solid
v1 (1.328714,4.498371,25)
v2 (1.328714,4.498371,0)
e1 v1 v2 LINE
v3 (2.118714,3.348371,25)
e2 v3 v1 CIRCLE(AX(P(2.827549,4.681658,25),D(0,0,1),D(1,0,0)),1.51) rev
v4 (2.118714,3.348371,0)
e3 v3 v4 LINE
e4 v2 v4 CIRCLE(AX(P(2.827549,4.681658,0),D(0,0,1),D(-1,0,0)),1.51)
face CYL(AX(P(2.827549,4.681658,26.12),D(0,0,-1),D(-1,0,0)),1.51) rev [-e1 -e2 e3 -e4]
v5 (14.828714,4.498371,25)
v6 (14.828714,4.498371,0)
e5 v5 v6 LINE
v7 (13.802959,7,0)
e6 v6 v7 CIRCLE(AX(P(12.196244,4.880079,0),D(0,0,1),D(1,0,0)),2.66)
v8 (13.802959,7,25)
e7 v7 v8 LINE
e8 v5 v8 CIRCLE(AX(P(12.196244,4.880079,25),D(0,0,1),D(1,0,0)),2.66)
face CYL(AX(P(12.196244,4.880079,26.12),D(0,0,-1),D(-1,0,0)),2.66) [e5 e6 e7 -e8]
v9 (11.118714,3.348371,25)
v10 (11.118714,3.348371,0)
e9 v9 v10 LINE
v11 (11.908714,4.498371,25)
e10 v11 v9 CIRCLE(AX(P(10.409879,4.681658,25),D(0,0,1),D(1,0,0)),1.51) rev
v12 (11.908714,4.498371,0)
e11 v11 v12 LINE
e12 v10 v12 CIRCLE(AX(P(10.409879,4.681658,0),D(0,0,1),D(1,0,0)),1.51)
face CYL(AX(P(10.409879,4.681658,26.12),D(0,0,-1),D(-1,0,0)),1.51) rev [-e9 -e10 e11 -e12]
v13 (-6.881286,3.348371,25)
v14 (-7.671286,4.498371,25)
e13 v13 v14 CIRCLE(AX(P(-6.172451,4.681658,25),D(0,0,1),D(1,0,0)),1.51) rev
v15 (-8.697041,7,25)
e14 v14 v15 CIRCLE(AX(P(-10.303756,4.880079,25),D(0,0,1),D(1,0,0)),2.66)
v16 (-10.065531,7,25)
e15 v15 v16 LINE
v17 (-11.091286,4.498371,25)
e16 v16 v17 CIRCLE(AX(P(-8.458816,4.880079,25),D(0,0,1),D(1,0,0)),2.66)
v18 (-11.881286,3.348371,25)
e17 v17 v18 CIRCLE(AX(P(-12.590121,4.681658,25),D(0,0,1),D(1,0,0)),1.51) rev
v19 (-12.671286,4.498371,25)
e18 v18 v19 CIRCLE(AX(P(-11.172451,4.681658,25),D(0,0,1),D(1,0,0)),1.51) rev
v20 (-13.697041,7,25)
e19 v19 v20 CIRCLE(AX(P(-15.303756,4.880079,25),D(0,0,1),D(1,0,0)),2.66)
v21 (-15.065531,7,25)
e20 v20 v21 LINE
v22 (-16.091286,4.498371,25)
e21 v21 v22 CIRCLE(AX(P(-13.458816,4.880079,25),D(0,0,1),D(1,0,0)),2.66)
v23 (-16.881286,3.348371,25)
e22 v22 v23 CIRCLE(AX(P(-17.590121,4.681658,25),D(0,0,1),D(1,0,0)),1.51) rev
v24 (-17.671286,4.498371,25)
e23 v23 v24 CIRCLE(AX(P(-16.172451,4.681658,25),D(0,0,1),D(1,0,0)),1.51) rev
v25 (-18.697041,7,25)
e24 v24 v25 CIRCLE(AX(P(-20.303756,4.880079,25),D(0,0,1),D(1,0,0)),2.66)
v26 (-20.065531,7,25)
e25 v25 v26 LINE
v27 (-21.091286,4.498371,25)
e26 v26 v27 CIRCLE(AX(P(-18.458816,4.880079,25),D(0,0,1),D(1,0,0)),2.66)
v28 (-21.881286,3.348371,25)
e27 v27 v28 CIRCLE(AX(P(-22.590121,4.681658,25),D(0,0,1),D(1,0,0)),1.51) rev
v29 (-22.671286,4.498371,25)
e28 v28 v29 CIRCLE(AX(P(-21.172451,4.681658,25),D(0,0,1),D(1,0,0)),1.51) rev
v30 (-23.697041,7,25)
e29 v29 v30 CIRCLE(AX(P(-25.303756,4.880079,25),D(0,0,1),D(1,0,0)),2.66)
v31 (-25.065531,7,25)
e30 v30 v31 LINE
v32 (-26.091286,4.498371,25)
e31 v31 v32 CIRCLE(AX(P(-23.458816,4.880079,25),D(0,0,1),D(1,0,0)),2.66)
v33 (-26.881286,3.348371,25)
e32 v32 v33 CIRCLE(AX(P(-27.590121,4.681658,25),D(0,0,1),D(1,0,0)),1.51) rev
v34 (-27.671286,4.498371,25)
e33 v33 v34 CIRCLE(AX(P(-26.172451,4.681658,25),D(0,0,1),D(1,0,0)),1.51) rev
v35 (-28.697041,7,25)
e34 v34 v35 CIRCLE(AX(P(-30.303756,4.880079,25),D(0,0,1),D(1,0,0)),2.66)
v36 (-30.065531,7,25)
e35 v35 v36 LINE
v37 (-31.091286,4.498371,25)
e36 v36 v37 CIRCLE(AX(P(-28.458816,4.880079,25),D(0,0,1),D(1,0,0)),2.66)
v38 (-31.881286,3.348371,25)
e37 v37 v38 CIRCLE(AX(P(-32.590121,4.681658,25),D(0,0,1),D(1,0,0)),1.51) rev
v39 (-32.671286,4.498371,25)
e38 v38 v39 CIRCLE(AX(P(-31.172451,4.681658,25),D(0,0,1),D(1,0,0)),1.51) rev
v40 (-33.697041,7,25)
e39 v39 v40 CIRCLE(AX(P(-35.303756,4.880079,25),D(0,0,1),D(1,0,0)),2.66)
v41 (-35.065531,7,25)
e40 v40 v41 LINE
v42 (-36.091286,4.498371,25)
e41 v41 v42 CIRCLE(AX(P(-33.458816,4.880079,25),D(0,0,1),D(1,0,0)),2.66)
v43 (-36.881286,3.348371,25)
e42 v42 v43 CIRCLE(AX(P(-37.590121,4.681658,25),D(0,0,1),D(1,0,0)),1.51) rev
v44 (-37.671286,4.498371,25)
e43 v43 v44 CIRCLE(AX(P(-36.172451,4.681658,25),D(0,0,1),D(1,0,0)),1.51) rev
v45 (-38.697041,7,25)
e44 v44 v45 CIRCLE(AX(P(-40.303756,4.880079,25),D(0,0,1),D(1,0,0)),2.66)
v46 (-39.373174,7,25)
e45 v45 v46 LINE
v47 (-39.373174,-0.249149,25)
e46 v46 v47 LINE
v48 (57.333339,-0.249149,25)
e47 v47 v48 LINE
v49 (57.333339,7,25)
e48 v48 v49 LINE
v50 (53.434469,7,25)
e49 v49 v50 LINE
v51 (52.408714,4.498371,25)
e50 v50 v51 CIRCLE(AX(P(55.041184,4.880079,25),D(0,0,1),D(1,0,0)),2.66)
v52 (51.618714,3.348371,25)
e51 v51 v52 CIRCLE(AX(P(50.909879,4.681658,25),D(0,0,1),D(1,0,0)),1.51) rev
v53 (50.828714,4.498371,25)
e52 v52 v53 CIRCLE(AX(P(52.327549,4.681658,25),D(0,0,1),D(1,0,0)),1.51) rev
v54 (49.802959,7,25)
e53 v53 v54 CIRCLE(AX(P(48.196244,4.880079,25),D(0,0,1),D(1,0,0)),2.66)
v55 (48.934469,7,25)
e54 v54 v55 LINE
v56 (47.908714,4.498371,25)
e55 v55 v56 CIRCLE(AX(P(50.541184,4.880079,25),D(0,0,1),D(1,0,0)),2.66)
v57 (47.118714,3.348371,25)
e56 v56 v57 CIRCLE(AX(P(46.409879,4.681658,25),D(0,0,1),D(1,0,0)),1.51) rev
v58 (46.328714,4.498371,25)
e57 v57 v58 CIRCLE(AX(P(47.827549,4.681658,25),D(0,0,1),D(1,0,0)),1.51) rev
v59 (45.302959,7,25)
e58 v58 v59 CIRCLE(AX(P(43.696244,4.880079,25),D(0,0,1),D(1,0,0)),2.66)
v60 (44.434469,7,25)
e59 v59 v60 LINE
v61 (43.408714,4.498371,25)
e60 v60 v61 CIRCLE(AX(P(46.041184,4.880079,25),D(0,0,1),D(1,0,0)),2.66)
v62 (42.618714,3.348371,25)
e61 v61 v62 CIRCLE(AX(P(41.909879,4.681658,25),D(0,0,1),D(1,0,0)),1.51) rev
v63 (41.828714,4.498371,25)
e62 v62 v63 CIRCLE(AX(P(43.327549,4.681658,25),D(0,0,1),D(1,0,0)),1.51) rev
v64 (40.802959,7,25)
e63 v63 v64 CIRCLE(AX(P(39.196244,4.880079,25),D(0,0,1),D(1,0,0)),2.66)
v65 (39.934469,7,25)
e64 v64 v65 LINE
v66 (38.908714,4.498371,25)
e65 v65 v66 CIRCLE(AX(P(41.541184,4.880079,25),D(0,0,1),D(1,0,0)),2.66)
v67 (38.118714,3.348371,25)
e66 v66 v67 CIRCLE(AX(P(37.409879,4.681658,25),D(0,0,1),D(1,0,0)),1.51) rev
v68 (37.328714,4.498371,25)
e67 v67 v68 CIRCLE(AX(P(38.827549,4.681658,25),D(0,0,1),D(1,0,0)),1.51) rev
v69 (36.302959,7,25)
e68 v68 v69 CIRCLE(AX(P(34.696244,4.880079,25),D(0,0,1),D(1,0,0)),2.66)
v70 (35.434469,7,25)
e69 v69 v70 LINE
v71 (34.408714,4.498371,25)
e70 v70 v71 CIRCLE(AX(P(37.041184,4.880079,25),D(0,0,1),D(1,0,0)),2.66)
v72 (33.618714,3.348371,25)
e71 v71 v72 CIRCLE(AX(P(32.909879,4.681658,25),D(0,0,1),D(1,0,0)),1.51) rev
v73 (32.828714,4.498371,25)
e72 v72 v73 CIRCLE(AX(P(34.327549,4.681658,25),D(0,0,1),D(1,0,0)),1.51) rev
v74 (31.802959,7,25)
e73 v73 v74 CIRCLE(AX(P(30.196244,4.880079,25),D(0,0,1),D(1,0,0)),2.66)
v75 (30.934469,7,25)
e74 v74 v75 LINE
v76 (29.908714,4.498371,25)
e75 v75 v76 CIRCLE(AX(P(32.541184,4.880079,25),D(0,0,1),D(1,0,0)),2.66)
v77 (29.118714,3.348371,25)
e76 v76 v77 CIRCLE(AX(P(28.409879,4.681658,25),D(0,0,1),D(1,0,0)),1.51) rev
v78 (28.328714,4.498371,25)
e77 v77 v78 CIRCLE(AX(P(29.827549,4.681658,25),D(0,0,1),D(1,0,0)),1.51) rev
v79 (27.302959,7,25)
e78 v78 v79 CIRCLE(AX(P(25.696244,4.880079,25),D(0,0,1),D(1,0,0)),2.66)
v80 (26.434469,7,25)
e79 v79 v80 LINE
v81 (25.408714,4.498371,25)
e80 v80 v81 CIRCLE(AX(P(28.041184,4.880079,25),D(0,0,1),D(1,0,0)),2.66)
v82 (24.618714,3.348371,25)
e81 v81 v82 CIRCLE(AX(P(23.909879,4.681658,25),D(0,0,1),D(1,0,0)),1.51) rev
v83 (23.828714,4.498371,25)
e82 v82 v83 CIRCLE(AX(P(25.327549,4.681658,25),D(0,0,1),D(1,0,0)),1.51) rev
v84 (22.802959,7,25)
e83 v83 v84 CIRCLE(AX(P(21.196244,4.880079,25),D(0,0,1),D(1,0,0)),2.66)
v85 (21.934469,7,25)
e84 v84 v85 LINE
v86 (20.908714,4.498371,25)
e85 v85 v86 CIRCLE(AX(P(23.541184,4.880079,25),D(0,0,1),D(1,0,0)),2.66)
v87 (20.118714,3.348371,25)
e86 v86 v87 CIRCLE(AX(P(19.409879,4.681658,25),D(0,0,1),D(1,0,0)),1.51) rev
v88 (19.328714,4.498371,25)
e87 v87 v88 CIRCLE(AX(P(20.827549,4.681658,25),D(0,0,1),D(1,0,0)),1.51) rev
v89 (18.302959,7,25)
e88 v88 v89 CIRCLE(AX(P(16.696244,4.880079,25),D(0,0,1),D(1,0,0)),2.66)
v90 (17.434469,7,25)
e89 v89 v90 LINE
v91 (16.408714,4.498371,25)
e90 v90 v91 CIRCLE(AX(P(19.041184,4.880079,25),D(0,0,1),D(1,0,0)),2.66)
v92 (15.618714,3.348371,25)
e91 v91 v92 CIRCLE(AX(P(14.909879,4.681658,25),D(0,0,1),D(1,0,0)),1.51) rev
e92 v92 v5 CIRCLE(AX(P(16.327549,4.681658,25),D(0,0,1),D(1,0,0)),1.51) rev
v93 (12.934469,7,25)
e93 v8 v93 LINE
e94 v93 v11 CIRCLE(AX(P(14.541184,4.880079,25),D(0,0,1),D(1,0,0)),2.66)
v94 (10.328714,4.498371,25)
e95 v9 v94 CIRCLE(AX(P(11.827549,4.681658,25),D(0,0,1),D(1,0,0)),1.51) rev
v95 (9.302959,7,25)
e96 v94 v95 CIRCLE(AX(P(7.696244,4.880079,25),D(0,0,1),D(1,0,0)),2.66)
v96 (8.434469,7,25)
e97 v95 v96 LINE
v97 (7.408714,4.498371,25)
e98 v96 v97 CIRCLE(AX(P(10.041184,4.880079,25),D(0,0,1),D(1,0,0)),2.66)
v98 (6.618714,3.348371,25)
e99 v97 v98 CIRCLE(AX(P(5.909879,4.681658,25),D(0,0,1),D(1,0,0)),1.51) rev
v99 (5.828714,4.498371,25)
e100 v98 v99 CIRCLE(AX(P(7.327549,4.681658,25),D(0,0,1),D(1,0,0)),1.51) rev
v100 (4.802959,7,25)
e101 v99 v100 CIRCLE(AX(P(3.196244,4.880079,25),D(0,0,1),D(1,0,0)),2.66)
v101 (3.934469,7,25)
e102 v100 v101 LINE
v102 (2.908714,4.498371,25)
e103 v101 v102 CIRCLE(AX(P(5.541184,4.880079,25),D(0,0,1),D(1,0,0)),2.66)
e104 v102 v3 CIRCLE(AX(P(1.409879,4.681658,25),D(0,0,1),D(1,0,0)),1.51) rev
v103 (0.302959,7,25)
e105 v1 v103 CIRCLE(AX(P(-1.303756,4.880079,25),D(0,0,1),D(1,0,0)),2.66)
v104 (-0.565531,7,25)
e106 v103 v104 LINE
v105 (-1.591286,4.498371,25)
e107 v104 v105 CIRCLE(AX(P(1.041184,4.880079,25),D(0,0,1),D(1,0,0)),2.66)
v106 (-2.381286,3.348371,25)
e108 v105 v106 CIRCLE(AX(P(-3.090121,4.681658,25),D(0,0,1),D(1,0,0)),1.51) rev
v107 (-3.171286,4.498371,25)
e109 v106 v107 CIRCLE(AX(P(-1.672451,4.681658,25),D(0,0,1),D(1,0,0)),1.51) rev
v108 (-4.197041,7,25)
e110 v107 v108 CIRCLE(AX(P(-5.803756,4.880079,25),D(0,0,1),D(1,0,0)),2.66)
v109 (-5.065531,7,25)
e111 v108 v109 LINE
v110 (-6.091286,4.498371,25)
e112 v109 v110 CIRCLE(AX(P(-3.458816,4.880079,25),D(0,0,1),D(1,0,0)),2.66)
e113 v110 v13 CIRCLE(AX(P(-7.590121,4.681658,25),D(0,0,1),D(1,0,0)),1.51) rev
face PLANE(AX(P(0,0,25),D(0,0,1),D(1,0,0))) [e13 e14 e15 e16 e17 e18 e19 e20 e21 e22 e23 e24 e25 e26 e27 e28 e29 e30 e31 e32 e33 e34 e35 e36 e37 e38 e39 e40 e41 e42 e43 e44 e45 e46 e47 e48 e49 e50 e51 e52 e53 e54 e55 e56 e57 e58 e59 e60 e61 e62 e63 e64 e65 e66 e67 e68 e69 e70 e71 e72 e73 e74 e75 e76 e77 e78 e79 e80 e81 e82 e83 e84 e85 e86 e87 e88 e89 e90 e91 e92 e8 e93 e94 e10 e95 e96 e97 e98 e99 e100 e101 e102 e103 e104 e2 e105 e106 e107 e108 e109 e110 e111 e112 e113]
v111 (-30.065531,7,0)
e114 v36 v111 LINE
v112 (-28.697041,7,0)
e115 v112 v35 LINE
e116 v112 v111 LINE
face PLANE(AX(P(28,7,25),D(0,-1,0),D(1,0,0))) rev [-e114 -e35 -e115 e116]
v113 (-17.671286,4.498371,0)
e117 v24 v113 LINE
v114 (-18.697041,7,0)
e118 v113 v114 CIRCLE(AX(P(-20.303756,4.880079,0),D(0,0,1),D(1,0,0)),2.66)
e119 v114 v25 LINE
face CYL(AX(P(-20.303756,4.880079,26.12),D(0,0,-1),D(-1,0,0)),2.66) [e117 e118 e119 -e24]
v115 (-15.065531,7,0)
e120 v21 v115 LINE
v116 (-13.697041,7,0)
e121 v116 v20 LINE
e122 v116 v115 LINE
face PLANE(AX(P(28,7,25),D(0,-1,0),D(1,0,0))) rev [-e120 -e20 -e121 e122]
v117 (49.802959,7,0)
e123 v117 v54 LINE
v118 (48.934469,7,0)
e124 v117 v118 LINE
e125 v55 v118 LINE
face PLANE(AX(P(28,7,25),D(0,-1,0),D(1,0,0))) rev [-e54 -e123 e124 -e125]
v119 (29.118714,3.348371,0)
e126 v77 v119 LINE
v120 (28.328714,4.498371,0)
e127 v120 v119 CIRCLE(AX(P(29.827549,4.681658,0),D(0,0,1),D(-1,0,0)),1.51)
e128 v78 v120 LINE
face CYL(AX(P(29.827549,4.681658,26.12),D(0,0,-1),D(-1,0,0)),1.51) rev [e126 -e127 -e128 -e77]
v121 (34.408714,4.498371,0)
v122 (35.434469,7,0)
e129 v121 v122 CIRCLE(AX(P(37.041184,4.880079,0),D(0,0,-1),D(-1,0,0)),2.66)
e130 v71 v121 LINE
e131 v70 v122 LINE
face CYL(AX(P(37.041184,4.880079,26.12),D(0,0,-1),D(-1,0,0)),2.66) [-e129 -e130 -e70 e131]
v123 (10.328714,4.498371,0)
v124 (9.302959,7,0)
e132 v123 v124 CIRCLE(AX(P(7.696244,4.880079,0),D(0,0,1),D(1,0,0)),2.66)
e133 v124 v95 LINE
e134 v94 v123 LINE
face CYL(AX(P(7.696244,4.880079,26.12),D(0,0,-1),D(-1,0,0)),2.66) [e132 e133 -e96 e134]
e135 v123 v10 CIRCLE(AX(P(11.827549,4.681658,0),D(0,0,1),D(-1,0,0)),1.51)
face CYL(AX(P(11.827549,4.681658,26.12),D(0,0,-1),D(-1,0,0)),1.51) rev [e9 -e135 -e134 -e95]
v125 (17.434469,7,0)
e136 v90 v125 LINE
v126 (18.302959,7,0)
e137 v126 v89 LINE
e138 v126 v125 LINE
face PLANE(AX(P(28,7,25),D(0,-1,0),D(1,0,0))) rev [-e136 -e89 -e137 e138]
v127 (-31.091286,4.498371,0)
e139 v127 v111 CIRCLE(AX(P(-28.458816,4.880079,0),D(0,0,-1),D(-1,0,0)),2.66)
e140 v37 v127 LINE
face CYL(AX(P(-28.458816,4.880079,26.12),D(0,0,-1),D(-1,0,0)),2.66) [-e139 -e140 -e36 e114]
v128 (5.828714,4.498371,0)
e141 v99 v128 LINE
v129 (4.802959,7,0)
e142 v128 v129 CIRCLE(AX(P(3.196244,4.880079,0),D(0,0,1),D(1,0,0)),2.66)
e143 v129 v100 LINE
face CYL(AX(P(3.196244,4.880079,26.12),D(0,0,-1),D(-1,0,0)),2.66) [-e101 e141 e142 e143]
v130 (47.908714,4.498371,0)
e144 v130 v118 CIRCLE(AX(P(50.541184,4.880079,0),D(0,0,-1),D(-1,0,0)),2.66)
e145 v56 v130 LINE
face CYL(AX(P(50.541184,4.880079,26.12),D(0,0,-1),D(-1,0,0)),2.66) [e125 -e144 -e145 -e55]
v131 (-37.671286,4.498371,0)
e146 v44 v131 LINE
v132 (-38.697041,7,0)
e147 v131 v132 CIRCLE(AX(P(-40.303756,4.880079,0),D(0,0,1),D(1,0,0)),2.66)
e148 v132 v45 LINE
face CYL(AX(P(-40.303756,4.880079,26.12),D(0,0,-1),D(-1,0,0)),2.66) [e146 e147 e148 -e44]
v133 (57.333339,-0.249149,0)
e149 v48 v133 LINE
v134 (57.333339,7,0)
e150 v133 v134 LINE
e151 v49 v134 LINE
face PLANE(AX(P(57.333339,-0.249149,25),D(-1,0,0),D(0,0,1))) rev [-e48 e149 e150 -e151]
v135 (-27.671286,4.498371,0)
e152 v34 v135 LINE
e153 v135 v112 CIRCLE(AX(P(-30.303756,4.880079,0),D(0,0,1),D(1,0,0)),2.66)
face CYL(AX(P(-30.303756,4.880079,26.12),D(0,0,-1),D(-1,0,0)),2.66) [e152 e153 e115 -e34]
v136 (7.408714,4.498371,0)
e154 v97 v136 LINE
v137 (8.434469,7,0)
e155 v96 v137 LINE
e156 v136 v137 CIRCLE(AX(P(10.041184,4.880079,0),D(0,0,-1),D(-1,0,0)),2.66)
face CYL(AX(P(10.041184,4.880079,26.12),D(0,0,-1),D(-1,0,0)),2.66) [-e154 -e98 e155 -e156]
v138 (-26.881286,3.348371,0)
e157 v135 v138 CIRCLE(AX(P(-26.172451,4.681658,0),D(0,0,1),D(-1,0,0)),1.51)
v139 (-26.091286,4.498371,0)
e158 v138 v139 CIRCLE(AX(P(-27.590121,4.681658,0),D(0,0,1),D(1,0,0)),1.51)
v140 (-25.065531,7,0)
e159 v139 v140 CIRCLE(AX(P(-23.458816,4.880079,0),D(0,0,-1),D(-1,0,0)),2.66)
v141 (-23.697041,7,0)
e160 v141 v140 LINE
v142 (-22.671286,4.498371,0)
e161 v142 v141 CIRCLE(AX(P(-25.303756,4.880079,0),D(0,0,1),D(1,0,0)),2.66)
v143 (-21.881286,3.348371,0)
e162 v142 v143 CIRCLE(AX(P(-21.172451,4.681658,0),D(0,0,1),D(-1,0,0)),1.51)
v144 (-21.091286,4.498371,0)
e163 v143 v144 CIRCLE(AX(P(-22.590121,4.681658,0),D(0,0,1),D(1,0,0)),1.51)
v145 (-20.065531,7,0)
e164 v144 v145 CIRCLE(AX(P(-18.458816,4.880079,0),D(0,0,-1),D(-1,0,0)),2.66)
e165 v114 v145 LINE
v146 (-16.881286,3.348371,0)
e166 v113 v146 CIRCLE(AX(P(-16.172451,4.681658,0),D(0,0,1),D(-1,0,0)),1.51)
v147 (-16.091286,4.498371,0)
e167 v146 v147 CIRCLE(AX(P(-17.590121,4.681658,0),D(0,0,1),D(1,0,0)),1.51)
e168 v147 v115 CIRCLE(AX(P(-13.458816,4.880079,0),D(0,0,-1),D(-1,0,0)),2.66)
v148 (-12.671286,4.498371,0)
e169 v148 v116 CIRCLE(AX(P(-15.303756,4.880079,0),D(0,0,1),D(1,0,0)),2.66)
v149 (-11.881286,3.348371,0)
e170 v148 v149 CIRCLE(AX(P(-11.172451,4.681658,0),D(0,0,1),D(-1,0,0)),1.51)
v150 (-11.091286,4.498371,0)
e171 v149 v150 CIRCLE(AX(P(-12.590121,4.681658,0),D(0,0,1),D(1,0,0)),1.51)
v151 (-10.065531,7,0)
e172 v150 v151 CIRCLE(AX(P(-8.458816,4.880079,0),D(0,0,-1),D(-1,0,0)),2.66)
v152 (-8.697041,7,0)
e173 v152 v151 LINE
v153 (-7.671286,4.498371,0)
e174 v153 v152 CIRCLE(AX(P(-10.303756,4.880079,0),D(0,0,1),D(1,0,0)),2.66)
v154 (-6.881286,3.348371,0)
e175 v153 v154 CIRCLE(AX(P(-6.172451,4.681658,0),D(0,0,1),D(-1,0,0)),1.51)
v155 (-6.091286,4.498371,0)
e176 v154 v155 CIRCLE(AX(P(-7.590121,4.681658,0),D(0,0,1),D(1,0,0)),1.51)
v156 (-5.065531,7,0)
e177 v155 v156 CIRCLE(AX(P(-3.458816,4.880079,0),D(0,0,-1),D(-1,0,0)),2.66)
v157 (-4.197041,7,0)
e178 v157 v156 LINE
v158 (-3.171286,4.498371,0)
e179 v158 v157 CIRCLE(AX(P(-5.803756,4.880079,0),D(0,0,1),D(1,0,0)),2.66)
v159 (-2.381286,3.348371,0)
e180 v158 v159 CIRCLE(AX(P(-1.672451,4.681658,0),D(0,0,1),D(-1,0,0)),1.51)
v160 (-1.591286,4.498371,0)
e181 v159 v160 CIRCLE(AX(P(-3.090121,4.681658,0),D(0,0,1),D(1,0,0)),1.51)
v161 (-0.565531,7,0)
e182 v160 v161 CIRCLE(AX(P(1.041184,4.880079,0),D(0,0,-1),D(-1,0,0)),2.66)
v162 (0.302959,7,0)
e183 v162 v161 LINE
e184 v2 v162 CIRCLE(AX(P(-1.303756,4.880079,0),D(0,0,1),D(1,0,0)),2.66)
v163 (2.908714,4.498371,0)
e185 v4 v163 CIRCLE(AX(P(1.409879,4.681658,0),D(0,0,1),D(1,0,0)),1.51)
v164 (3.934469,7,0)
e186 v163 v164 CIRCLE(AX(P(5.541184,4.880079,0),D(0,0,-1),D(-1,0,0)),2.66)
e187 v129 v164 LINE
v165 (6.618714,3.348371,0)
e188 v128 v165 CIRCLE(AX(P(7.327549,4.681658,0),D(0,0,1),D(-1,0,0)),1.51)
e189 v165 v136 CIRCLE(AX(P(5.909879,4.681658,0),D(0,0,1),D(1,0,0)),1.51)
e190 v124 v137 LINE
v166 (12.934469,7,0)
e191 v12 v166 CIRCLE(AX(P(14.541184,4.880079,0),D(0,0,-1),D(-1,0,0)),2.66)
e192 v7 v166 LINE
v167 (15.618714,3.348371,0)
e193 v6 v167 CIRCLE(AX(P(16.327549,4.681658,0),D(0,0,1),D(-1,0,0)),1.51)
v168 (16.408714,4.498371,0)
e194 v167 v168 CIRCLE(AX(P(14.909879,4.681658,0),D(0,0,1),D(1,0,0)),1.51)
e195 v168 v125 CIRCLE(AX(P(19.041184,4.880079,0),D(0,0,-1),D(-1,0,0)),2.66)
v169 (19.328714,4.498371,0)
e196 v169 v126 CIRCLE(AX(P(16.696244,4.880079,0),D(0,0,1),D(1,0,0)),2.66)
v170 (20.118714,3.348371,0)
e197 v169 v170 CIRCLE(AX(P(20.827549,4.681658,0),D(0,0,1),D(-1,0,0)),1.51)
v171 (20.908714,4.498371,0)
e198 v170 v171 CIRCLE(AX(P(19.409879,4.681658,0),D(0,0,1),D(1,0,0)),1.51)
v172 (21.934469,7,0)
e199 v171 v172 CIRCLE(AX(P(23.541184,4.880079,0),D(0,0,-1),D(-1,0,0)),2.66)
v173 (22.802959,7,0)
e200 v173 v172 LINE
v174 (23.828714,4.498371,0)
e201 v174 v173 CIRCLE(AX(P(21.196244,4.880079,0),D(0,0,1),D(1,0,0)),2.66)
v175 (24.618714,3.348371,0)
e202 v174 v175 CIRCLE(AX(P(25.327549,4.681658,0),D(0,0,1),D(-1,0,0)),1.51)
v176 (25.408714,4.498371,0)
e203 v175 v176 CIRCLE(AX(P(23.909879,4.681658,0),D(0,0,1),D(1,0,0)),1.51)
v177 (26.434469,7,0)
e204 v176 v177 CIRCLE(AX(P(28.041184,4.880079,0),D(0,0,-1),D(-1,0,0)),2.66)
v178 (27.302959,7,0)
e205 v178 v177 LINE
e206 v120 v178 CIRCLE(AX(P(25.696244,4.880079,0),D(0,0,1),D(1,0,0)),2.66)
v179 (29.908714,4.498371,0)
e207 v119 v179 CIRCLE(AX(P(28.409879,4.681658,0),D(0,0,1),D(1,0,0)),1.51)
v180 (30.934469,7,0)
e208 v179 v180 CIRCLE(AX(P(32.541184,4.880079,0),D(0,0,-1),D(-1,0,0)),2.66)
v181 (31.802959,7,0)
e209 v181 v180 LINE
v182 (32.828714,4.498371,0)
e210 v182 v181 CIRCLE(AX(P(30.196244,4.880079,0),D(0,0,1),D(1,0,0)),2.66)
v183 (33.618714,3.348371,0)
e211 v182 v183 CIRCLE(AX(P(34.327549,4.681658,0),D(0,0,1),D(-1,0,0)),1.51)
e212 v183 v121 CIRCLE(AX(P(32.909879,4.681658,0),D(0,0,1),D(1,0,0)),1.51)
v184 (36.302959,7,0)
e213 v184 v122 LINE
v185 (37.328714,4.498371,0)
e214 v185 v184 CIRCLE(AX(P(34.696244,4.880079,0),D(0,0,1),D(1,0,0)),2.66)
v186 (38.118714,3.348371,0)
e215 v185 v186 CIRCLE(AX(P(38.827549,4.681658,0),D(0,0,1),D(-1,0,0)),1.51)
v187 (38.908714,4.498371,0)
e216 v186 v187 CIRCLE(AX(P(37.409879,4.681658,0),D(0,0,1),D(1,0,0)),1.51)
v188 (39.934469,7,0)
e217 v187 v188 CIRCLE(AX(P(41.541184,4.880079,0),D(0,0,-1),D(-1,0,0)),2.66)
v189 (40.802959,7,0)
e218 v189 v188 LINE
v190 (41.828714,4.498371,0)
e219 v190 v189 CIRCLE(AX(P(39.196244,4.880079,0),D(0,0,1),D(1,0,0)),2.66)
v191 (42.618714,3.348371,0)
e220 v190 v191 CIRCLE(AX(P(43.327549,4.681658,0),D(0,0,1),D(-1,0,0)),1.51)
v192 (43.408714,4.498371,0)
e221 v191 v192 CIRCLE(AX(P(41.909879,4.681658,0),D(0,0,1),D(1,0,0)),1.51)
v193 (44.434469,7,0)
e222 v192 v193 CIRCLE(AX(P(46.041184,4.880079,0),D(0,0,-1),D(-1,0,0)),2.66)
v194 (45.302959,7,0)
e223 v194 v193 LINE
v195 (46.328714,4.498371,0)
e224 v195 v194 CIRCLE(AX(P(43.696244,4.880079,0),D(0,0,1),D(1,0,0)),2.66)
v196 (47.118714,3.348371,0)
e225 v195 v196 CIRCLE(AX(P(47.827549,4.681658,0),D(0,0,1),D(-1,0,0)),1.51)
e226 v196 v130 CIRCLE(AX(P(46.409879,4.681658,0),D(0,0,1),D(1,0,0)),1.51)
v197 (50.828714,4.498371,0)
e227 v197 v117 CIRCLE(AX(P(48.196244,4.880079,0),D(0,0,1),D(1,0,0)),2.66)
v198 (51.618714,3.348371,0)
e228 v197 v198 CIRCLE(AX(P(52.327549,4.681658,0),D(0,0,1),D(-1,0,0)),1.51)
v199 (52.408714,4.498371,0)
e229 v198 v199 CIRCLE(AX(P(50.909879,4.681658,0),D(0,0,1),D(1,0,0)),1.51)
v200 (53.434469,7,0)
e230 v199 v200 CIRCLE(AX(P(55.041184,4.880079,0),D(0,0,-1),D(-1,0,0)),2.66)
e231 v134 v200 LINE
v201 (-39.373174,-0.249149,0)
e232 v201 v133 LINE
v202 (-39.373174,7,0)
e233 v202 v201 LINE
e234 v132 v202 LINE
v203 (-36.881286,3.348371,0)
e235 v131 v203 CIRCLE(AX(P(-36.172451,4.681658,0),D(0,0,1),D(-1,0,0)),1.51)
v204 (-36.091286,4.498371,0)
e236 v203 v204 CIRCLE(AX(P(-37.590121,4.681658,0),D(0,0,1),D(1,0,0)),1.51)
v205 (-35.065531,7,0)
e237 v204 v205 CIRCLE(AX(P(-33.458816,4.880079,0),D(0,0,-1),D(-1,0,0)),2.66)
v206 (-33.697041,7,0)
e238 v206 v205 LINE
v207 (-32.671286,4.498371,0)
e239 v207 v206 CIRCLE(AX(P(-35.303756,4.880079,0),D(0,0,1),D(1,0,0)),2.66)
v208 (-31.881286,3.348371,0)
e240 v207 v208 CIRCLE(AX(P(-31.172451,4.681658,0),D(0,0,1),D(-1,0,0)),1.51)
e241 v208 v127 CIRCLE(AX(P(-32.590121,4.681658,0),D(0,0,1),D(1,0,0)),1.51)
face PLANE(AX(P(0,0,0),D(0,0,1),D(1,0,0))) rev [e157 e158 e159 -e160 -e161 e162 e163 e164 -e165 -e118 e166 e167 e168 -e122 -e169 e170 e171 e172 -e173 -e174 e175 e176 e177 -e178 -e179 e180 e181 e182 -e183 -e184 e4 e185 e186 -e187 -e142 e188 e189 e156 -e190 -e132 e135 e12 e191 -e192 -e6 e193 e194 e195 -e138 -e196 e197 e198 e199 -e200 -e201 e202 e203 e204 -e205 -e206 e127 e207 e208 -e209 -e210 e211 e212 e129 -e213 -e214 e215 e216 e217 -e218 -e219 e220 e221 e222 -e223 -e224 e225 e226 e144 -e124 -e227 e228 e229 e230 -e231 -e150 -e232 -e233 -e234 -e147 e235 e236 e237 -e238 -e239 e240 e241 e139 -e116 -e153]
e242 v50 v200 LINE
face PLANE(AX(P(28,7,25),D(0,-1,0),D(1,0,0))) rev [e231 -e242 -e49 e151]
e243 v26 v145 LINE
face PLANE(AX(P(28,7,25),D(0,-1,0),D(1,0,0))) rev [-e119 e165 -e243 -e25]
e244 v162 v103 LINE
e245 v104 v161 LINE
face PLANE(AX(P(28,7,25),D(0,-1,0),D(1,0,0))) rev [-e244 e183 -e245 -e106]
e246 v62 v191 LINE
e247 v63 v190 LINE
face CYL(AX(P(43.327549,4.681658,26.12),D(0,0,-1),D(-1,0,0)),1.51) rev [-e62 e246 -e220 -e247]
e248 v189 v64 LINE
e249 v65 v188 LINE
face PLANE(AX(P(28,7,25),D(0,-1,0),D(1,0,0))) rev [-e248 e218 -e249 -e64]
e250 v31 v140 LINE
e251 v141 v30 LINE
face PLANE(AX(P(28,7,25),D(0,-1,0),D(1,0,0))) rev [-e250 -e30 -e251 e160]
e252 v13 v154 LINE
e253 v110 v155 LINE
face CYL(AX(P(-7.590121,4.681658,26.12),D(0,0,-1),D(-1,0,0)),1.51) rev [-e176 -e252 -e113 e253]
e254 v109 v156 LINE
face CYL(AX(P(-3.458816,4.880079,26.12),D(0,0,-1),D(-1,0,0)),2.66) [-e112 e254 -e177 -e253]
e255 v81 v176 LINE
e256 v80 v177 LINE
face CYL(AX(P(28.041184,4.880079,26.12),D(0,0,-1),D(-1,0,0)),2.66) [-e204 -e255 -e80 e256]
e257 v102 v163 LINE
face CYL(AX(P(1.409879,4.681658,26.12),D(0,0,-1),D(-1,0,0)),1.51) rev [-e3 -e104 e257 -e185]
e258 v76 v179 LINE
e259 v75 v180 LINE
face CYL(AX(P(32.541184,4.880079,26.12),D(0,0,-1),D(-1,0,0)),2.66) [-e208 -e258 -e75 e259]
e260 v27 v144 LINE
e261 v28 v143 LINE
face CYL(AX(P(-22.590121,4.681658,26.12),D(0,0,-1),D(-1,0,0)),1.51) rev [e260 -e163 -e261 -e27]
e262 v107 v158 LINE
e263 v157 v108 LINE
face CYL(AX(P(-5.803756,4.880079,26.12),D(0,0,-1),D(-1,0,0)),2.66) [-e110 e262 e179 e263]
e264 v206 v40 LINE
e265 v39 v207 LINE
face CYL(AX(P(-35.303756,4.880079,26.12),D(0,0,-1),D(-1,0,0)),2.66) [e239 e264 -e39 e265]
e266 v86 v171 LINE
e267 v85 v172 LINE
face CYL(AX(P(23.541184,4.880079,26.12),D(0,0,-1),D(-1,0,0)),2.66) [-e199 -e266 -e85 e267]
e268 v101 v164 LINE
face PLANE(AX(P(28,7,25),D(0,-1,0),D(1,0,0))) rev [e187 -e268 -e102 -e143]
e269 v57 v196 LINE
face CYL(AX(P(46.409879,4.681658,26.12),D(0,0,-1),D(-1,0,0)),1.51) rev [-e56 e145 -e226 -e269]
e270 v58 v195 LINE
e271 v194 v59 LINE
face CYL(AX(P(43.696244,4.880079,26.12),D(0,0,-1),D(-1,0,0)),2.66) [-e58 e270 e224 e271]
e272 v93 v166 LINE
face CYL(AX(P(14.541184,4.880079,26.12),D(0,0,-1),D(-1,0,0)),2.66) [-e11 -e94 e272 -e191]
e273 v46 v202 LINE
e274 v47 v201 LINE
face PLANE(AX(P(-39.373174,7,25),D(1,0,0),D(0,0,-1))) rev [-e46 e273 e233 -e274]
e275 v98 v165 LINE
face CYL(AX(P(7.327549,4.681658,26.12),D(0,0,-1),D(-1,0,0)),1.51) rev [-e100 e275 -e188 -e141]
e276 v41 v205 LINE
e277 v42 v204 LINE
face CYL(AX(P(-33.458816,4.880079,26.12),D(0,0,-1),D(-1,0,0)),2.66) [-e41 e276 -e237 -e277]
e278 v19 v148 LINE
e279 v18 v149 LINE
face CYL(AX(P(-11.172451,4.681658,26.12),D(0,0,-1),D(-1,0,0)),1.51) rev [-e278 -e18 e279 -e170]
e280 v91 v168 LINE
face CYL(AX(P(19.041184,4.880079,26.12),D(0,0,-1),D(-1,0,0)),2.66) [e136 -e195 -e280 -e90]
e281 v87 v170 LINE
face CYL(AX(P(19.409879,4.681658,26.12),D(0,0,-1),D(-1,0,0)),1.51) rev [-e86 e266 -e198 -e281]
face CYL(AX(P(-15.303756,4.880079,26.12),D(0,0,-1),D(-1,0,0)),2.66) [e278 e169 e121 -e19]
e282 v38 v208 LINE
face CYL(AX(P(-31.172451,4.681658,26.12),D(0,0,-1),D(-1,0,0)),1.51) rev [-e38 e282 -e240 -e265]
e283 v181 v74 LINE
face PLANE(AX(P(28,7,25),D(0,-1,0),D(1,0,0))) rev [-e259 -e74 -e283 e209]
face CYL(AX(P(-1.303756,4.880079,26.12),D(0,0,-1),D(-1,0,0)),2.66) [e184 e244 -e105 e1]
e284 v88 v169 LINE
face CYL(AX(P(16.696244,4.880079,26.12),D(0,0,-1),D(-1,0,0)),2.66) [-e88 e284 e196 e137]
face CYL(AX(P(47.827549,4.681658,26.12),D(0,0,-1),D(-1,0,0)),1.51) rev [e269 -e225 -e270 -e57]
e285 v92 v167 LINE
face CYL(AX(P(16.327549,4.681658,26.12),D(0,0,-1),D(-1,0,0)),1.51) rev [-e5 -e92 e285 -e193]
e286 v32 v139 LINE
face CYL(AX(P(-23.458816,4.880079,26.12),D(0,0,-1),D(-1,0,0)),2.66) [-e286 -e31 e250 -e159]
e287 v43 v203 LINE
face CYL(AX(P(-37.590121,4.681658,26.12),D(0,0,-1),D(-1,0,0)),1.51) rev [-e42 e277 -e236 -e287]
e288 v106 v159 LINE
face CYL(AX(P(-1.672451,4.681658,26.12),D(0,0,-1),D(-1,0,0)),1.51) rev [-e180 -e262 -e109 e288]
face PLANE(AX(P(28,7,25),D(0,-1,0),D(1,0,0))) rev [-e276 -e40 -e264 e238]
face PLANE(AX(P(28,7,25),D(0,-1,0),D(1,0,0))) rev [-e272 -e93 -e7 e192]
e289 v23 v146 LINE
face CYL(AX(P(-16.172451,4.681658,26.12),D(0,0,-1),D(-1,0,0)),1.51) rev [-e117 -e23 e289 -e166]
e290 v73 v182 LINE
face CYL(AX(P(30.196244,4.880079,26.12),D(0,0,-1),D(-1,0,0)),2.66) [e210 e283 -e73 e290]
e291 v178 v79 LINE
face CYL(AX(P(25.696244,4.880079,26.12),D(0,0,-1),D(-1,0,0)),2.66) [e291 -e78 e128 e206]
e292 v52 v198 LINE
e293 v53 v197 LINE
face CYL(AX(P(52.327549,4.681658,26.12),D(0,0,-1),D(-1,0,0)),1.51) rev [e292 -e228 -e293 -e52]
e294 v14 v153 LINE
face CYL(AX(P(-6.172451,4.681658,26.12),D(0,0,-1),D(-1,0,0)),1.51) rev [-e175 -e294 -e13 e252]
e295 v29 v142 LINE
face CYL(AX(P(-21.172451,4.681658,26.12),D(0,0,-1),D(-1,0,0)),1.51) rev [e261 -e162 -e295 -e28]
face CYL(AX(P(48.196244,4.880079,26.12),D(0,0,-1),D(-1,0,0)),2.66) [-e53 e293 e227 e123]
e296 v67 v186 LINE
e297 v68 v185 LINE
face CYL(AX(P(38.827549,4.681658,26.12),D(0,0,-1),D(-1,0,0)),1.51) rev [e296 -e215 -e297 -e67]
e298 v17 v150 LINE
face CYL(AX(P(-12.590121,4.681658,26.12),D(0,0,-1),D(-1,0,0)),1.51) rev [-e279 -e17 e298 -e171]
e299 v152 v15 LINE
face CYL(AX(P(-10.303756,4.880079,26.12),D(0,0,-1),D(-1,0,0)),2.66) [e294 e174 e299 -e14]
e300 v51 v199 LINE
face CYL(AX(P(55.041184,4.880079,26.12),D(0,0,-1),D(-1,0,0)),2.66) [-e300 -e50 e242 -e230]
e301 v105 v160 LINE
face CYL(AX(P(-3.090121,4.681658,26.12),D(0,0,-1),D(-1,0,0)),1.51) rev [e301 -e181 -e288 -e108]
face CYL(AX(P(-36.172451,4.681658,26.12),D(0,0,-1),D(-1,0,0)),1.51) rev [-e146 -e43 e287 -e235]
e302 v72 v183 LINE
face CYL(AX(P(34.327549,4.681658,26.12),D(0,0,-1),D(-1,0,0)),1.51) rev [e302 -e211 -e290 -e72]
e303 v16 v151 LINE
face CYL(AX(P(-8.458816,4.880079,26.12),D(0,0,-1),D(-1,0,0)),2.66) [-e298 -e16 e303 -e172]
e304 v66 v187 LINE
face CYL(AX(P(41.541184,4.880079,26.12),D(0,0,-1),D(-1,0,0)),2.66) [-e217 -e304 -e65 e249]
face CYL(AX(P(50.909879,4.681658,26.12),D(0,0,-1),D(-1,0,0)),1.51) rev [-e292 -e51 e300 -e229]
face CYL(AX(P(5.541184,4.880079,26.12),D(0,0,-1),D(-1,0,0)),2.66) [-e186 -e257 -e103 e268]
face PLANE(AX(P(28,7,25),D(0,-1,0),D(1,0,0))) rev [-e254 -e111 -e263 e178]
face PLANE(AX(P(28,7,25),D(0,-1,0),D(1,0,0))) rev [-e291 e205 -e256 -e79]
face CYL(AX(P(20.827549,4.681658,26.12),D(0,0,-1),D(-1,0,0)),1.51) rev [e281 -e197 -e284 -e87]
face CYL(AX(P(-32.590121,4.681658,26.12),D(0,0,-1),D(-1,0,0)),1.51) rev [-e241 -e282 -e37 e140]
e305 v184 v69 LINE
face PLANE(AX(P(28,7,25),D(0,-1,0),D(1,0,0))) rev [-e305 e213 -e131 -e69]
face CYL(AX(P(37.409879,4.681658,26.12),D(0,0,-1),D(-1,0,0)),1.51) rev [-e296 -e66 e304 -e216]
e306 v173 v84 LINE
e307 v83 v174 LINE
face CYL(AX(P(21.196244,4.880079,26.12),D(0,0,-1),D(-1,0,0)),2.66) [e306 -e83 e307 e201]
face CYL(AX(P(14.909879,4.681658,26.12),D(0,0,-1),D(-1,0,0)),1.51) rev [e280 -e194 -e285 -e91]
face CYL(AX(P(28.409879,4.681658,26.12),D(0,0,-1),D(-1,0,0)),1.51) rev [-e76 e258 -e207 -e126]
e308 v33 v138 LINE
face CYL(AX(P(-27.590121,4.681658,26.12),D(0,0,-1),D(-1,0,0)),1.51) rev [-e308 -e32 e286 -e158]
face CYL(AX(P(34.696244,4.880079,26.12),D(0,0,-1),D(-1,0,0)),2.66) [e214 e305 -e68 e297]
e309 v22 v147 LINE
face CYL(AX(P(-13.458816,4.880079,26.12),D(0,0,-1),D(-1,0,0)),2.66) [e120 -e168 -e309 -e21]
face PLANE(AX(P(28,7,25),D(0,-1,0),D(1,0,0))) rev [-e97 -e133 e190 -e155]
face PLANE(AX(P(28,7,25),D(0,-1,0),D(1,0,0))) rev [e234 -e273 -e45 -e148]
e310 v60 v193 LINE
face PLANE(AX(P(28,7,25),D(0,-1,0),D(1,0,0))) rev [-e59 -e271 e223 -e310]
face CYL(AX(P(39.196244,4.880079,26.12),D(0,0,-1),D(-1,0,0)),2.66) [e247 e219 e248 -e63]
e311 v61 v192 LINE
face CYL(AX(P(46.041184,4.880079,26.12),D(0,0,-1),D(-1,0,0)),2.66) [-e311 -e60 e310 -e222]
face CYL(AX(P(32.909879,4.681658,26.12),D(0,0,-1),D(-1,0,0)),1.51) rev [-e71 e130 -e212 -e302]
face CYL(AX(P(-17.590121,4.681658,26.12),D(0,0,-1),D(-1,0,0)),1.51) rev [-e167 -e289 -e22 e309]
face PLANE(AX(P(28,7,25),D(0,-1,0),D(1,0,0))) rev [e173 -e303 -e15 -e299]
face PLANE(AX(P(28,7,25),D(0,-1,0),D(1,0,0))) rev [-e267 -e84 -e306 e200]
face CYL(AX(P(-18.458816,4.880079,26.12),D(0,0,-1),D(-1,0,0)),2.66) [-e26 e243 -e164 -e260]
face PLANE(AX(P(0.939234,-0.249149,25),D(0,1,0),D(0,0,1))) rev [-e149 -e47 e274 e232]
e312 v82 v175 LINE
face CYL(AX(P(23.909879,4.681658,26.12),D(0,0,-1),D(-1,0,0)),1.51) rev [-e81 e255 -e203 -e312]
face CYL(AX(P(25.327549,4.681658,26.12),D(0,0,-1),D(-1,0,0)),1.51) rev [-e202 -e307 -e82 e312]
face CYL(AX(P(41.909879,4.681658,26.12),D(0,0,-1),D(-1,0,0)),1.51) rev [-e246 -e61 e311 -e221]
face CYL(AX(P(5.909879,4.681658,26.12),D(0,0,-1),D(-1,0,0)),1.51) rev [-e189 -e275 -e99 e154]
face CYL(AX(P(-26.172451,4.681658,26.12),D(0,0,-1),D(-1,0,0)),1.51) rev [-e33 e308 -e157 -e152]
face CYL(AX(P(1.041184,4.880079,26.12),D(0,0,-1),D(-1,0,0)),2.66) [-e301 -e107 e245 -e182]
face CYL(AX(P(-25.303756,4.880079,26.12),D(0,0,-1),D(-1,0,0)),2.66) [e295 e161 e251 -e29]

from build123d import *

# Parameters (mm, degrees)
BOSS_EXTRUDE1_DEPTH = 25
CUT_EXTRUDE1_DEPTH  = 26.12
LPATTERN1_COUNT     = 10
LPATTERN1_PITCH     = 5
LPATTERN1_COL_COUNT = 14
LPATTERN1_COL_PITCH = 4.5


with BuildPart() as part:
    # Sketch1 → Boss-Extrude1 (new body)
    with BuildSketch(Plane.XY):
        Polygon((28.000000003, 7), (-39.373173928, 7), (-39.373173928, -0.249149017), (0.939234275, -0.249149017), (57.333339072, -0.249149017), (57.333339072, 7), align=None)
    extrude(amount=BOSS_EXTRUDE1_DEPTH)

    # Sketch2 → Cut-Extrude1 (cut)
    with BuildSketch(Plane.XY):
        with BuildLine():
            ThreePointArc((-6.881285782, 3.348371163), (-7.417069895, 3.826658598), (-7.671285782, 4.498371163))
            ThreePointArc((-7.671285782, 4.498371163), (-7.912320341, 6.04482582), (-8.981285782, 7.188037328))
            ThreePointArc((-8.981285782, 7.188037328), (-6.881285782, 7.762283268), (-4.781285782, 7.188037328))
            ThreePointArc((-4.781285782, 7.188037328), (-5.850251222, 6.04482582), (-6.091285782, 4.498371163))
            ThreePointArc((-6.091285782, 4.498371163), (-6.345501668, 3.826658598), (-6.881285782, 3.348371163))
        make_face()
    cut_extrude1 = extrude(amount=CUT_EXTRUDE1_DEPTH, mode=Mode.SUBTRACT)

    # LPattern1: Cut-Extrude1 ×10
    with Locations(*[(-i * LPATTERN1_PITCH, 0, 0) for i in range(1, LPATTERN1_COUNT)]):
        add(cut_extrude1, mode=Mode.SUBTRACT)

    # LPattern1 col: Cut-Extrude1 ×14
    with Locations(*[(i * LPATTERN1_COL_PITCH, 0, 0) for i in range(1, LPATTERN1_COL_COUNT)]):
        add(cut_extrude1, mode=Mode.SUBTRACT)


solid = part.part
